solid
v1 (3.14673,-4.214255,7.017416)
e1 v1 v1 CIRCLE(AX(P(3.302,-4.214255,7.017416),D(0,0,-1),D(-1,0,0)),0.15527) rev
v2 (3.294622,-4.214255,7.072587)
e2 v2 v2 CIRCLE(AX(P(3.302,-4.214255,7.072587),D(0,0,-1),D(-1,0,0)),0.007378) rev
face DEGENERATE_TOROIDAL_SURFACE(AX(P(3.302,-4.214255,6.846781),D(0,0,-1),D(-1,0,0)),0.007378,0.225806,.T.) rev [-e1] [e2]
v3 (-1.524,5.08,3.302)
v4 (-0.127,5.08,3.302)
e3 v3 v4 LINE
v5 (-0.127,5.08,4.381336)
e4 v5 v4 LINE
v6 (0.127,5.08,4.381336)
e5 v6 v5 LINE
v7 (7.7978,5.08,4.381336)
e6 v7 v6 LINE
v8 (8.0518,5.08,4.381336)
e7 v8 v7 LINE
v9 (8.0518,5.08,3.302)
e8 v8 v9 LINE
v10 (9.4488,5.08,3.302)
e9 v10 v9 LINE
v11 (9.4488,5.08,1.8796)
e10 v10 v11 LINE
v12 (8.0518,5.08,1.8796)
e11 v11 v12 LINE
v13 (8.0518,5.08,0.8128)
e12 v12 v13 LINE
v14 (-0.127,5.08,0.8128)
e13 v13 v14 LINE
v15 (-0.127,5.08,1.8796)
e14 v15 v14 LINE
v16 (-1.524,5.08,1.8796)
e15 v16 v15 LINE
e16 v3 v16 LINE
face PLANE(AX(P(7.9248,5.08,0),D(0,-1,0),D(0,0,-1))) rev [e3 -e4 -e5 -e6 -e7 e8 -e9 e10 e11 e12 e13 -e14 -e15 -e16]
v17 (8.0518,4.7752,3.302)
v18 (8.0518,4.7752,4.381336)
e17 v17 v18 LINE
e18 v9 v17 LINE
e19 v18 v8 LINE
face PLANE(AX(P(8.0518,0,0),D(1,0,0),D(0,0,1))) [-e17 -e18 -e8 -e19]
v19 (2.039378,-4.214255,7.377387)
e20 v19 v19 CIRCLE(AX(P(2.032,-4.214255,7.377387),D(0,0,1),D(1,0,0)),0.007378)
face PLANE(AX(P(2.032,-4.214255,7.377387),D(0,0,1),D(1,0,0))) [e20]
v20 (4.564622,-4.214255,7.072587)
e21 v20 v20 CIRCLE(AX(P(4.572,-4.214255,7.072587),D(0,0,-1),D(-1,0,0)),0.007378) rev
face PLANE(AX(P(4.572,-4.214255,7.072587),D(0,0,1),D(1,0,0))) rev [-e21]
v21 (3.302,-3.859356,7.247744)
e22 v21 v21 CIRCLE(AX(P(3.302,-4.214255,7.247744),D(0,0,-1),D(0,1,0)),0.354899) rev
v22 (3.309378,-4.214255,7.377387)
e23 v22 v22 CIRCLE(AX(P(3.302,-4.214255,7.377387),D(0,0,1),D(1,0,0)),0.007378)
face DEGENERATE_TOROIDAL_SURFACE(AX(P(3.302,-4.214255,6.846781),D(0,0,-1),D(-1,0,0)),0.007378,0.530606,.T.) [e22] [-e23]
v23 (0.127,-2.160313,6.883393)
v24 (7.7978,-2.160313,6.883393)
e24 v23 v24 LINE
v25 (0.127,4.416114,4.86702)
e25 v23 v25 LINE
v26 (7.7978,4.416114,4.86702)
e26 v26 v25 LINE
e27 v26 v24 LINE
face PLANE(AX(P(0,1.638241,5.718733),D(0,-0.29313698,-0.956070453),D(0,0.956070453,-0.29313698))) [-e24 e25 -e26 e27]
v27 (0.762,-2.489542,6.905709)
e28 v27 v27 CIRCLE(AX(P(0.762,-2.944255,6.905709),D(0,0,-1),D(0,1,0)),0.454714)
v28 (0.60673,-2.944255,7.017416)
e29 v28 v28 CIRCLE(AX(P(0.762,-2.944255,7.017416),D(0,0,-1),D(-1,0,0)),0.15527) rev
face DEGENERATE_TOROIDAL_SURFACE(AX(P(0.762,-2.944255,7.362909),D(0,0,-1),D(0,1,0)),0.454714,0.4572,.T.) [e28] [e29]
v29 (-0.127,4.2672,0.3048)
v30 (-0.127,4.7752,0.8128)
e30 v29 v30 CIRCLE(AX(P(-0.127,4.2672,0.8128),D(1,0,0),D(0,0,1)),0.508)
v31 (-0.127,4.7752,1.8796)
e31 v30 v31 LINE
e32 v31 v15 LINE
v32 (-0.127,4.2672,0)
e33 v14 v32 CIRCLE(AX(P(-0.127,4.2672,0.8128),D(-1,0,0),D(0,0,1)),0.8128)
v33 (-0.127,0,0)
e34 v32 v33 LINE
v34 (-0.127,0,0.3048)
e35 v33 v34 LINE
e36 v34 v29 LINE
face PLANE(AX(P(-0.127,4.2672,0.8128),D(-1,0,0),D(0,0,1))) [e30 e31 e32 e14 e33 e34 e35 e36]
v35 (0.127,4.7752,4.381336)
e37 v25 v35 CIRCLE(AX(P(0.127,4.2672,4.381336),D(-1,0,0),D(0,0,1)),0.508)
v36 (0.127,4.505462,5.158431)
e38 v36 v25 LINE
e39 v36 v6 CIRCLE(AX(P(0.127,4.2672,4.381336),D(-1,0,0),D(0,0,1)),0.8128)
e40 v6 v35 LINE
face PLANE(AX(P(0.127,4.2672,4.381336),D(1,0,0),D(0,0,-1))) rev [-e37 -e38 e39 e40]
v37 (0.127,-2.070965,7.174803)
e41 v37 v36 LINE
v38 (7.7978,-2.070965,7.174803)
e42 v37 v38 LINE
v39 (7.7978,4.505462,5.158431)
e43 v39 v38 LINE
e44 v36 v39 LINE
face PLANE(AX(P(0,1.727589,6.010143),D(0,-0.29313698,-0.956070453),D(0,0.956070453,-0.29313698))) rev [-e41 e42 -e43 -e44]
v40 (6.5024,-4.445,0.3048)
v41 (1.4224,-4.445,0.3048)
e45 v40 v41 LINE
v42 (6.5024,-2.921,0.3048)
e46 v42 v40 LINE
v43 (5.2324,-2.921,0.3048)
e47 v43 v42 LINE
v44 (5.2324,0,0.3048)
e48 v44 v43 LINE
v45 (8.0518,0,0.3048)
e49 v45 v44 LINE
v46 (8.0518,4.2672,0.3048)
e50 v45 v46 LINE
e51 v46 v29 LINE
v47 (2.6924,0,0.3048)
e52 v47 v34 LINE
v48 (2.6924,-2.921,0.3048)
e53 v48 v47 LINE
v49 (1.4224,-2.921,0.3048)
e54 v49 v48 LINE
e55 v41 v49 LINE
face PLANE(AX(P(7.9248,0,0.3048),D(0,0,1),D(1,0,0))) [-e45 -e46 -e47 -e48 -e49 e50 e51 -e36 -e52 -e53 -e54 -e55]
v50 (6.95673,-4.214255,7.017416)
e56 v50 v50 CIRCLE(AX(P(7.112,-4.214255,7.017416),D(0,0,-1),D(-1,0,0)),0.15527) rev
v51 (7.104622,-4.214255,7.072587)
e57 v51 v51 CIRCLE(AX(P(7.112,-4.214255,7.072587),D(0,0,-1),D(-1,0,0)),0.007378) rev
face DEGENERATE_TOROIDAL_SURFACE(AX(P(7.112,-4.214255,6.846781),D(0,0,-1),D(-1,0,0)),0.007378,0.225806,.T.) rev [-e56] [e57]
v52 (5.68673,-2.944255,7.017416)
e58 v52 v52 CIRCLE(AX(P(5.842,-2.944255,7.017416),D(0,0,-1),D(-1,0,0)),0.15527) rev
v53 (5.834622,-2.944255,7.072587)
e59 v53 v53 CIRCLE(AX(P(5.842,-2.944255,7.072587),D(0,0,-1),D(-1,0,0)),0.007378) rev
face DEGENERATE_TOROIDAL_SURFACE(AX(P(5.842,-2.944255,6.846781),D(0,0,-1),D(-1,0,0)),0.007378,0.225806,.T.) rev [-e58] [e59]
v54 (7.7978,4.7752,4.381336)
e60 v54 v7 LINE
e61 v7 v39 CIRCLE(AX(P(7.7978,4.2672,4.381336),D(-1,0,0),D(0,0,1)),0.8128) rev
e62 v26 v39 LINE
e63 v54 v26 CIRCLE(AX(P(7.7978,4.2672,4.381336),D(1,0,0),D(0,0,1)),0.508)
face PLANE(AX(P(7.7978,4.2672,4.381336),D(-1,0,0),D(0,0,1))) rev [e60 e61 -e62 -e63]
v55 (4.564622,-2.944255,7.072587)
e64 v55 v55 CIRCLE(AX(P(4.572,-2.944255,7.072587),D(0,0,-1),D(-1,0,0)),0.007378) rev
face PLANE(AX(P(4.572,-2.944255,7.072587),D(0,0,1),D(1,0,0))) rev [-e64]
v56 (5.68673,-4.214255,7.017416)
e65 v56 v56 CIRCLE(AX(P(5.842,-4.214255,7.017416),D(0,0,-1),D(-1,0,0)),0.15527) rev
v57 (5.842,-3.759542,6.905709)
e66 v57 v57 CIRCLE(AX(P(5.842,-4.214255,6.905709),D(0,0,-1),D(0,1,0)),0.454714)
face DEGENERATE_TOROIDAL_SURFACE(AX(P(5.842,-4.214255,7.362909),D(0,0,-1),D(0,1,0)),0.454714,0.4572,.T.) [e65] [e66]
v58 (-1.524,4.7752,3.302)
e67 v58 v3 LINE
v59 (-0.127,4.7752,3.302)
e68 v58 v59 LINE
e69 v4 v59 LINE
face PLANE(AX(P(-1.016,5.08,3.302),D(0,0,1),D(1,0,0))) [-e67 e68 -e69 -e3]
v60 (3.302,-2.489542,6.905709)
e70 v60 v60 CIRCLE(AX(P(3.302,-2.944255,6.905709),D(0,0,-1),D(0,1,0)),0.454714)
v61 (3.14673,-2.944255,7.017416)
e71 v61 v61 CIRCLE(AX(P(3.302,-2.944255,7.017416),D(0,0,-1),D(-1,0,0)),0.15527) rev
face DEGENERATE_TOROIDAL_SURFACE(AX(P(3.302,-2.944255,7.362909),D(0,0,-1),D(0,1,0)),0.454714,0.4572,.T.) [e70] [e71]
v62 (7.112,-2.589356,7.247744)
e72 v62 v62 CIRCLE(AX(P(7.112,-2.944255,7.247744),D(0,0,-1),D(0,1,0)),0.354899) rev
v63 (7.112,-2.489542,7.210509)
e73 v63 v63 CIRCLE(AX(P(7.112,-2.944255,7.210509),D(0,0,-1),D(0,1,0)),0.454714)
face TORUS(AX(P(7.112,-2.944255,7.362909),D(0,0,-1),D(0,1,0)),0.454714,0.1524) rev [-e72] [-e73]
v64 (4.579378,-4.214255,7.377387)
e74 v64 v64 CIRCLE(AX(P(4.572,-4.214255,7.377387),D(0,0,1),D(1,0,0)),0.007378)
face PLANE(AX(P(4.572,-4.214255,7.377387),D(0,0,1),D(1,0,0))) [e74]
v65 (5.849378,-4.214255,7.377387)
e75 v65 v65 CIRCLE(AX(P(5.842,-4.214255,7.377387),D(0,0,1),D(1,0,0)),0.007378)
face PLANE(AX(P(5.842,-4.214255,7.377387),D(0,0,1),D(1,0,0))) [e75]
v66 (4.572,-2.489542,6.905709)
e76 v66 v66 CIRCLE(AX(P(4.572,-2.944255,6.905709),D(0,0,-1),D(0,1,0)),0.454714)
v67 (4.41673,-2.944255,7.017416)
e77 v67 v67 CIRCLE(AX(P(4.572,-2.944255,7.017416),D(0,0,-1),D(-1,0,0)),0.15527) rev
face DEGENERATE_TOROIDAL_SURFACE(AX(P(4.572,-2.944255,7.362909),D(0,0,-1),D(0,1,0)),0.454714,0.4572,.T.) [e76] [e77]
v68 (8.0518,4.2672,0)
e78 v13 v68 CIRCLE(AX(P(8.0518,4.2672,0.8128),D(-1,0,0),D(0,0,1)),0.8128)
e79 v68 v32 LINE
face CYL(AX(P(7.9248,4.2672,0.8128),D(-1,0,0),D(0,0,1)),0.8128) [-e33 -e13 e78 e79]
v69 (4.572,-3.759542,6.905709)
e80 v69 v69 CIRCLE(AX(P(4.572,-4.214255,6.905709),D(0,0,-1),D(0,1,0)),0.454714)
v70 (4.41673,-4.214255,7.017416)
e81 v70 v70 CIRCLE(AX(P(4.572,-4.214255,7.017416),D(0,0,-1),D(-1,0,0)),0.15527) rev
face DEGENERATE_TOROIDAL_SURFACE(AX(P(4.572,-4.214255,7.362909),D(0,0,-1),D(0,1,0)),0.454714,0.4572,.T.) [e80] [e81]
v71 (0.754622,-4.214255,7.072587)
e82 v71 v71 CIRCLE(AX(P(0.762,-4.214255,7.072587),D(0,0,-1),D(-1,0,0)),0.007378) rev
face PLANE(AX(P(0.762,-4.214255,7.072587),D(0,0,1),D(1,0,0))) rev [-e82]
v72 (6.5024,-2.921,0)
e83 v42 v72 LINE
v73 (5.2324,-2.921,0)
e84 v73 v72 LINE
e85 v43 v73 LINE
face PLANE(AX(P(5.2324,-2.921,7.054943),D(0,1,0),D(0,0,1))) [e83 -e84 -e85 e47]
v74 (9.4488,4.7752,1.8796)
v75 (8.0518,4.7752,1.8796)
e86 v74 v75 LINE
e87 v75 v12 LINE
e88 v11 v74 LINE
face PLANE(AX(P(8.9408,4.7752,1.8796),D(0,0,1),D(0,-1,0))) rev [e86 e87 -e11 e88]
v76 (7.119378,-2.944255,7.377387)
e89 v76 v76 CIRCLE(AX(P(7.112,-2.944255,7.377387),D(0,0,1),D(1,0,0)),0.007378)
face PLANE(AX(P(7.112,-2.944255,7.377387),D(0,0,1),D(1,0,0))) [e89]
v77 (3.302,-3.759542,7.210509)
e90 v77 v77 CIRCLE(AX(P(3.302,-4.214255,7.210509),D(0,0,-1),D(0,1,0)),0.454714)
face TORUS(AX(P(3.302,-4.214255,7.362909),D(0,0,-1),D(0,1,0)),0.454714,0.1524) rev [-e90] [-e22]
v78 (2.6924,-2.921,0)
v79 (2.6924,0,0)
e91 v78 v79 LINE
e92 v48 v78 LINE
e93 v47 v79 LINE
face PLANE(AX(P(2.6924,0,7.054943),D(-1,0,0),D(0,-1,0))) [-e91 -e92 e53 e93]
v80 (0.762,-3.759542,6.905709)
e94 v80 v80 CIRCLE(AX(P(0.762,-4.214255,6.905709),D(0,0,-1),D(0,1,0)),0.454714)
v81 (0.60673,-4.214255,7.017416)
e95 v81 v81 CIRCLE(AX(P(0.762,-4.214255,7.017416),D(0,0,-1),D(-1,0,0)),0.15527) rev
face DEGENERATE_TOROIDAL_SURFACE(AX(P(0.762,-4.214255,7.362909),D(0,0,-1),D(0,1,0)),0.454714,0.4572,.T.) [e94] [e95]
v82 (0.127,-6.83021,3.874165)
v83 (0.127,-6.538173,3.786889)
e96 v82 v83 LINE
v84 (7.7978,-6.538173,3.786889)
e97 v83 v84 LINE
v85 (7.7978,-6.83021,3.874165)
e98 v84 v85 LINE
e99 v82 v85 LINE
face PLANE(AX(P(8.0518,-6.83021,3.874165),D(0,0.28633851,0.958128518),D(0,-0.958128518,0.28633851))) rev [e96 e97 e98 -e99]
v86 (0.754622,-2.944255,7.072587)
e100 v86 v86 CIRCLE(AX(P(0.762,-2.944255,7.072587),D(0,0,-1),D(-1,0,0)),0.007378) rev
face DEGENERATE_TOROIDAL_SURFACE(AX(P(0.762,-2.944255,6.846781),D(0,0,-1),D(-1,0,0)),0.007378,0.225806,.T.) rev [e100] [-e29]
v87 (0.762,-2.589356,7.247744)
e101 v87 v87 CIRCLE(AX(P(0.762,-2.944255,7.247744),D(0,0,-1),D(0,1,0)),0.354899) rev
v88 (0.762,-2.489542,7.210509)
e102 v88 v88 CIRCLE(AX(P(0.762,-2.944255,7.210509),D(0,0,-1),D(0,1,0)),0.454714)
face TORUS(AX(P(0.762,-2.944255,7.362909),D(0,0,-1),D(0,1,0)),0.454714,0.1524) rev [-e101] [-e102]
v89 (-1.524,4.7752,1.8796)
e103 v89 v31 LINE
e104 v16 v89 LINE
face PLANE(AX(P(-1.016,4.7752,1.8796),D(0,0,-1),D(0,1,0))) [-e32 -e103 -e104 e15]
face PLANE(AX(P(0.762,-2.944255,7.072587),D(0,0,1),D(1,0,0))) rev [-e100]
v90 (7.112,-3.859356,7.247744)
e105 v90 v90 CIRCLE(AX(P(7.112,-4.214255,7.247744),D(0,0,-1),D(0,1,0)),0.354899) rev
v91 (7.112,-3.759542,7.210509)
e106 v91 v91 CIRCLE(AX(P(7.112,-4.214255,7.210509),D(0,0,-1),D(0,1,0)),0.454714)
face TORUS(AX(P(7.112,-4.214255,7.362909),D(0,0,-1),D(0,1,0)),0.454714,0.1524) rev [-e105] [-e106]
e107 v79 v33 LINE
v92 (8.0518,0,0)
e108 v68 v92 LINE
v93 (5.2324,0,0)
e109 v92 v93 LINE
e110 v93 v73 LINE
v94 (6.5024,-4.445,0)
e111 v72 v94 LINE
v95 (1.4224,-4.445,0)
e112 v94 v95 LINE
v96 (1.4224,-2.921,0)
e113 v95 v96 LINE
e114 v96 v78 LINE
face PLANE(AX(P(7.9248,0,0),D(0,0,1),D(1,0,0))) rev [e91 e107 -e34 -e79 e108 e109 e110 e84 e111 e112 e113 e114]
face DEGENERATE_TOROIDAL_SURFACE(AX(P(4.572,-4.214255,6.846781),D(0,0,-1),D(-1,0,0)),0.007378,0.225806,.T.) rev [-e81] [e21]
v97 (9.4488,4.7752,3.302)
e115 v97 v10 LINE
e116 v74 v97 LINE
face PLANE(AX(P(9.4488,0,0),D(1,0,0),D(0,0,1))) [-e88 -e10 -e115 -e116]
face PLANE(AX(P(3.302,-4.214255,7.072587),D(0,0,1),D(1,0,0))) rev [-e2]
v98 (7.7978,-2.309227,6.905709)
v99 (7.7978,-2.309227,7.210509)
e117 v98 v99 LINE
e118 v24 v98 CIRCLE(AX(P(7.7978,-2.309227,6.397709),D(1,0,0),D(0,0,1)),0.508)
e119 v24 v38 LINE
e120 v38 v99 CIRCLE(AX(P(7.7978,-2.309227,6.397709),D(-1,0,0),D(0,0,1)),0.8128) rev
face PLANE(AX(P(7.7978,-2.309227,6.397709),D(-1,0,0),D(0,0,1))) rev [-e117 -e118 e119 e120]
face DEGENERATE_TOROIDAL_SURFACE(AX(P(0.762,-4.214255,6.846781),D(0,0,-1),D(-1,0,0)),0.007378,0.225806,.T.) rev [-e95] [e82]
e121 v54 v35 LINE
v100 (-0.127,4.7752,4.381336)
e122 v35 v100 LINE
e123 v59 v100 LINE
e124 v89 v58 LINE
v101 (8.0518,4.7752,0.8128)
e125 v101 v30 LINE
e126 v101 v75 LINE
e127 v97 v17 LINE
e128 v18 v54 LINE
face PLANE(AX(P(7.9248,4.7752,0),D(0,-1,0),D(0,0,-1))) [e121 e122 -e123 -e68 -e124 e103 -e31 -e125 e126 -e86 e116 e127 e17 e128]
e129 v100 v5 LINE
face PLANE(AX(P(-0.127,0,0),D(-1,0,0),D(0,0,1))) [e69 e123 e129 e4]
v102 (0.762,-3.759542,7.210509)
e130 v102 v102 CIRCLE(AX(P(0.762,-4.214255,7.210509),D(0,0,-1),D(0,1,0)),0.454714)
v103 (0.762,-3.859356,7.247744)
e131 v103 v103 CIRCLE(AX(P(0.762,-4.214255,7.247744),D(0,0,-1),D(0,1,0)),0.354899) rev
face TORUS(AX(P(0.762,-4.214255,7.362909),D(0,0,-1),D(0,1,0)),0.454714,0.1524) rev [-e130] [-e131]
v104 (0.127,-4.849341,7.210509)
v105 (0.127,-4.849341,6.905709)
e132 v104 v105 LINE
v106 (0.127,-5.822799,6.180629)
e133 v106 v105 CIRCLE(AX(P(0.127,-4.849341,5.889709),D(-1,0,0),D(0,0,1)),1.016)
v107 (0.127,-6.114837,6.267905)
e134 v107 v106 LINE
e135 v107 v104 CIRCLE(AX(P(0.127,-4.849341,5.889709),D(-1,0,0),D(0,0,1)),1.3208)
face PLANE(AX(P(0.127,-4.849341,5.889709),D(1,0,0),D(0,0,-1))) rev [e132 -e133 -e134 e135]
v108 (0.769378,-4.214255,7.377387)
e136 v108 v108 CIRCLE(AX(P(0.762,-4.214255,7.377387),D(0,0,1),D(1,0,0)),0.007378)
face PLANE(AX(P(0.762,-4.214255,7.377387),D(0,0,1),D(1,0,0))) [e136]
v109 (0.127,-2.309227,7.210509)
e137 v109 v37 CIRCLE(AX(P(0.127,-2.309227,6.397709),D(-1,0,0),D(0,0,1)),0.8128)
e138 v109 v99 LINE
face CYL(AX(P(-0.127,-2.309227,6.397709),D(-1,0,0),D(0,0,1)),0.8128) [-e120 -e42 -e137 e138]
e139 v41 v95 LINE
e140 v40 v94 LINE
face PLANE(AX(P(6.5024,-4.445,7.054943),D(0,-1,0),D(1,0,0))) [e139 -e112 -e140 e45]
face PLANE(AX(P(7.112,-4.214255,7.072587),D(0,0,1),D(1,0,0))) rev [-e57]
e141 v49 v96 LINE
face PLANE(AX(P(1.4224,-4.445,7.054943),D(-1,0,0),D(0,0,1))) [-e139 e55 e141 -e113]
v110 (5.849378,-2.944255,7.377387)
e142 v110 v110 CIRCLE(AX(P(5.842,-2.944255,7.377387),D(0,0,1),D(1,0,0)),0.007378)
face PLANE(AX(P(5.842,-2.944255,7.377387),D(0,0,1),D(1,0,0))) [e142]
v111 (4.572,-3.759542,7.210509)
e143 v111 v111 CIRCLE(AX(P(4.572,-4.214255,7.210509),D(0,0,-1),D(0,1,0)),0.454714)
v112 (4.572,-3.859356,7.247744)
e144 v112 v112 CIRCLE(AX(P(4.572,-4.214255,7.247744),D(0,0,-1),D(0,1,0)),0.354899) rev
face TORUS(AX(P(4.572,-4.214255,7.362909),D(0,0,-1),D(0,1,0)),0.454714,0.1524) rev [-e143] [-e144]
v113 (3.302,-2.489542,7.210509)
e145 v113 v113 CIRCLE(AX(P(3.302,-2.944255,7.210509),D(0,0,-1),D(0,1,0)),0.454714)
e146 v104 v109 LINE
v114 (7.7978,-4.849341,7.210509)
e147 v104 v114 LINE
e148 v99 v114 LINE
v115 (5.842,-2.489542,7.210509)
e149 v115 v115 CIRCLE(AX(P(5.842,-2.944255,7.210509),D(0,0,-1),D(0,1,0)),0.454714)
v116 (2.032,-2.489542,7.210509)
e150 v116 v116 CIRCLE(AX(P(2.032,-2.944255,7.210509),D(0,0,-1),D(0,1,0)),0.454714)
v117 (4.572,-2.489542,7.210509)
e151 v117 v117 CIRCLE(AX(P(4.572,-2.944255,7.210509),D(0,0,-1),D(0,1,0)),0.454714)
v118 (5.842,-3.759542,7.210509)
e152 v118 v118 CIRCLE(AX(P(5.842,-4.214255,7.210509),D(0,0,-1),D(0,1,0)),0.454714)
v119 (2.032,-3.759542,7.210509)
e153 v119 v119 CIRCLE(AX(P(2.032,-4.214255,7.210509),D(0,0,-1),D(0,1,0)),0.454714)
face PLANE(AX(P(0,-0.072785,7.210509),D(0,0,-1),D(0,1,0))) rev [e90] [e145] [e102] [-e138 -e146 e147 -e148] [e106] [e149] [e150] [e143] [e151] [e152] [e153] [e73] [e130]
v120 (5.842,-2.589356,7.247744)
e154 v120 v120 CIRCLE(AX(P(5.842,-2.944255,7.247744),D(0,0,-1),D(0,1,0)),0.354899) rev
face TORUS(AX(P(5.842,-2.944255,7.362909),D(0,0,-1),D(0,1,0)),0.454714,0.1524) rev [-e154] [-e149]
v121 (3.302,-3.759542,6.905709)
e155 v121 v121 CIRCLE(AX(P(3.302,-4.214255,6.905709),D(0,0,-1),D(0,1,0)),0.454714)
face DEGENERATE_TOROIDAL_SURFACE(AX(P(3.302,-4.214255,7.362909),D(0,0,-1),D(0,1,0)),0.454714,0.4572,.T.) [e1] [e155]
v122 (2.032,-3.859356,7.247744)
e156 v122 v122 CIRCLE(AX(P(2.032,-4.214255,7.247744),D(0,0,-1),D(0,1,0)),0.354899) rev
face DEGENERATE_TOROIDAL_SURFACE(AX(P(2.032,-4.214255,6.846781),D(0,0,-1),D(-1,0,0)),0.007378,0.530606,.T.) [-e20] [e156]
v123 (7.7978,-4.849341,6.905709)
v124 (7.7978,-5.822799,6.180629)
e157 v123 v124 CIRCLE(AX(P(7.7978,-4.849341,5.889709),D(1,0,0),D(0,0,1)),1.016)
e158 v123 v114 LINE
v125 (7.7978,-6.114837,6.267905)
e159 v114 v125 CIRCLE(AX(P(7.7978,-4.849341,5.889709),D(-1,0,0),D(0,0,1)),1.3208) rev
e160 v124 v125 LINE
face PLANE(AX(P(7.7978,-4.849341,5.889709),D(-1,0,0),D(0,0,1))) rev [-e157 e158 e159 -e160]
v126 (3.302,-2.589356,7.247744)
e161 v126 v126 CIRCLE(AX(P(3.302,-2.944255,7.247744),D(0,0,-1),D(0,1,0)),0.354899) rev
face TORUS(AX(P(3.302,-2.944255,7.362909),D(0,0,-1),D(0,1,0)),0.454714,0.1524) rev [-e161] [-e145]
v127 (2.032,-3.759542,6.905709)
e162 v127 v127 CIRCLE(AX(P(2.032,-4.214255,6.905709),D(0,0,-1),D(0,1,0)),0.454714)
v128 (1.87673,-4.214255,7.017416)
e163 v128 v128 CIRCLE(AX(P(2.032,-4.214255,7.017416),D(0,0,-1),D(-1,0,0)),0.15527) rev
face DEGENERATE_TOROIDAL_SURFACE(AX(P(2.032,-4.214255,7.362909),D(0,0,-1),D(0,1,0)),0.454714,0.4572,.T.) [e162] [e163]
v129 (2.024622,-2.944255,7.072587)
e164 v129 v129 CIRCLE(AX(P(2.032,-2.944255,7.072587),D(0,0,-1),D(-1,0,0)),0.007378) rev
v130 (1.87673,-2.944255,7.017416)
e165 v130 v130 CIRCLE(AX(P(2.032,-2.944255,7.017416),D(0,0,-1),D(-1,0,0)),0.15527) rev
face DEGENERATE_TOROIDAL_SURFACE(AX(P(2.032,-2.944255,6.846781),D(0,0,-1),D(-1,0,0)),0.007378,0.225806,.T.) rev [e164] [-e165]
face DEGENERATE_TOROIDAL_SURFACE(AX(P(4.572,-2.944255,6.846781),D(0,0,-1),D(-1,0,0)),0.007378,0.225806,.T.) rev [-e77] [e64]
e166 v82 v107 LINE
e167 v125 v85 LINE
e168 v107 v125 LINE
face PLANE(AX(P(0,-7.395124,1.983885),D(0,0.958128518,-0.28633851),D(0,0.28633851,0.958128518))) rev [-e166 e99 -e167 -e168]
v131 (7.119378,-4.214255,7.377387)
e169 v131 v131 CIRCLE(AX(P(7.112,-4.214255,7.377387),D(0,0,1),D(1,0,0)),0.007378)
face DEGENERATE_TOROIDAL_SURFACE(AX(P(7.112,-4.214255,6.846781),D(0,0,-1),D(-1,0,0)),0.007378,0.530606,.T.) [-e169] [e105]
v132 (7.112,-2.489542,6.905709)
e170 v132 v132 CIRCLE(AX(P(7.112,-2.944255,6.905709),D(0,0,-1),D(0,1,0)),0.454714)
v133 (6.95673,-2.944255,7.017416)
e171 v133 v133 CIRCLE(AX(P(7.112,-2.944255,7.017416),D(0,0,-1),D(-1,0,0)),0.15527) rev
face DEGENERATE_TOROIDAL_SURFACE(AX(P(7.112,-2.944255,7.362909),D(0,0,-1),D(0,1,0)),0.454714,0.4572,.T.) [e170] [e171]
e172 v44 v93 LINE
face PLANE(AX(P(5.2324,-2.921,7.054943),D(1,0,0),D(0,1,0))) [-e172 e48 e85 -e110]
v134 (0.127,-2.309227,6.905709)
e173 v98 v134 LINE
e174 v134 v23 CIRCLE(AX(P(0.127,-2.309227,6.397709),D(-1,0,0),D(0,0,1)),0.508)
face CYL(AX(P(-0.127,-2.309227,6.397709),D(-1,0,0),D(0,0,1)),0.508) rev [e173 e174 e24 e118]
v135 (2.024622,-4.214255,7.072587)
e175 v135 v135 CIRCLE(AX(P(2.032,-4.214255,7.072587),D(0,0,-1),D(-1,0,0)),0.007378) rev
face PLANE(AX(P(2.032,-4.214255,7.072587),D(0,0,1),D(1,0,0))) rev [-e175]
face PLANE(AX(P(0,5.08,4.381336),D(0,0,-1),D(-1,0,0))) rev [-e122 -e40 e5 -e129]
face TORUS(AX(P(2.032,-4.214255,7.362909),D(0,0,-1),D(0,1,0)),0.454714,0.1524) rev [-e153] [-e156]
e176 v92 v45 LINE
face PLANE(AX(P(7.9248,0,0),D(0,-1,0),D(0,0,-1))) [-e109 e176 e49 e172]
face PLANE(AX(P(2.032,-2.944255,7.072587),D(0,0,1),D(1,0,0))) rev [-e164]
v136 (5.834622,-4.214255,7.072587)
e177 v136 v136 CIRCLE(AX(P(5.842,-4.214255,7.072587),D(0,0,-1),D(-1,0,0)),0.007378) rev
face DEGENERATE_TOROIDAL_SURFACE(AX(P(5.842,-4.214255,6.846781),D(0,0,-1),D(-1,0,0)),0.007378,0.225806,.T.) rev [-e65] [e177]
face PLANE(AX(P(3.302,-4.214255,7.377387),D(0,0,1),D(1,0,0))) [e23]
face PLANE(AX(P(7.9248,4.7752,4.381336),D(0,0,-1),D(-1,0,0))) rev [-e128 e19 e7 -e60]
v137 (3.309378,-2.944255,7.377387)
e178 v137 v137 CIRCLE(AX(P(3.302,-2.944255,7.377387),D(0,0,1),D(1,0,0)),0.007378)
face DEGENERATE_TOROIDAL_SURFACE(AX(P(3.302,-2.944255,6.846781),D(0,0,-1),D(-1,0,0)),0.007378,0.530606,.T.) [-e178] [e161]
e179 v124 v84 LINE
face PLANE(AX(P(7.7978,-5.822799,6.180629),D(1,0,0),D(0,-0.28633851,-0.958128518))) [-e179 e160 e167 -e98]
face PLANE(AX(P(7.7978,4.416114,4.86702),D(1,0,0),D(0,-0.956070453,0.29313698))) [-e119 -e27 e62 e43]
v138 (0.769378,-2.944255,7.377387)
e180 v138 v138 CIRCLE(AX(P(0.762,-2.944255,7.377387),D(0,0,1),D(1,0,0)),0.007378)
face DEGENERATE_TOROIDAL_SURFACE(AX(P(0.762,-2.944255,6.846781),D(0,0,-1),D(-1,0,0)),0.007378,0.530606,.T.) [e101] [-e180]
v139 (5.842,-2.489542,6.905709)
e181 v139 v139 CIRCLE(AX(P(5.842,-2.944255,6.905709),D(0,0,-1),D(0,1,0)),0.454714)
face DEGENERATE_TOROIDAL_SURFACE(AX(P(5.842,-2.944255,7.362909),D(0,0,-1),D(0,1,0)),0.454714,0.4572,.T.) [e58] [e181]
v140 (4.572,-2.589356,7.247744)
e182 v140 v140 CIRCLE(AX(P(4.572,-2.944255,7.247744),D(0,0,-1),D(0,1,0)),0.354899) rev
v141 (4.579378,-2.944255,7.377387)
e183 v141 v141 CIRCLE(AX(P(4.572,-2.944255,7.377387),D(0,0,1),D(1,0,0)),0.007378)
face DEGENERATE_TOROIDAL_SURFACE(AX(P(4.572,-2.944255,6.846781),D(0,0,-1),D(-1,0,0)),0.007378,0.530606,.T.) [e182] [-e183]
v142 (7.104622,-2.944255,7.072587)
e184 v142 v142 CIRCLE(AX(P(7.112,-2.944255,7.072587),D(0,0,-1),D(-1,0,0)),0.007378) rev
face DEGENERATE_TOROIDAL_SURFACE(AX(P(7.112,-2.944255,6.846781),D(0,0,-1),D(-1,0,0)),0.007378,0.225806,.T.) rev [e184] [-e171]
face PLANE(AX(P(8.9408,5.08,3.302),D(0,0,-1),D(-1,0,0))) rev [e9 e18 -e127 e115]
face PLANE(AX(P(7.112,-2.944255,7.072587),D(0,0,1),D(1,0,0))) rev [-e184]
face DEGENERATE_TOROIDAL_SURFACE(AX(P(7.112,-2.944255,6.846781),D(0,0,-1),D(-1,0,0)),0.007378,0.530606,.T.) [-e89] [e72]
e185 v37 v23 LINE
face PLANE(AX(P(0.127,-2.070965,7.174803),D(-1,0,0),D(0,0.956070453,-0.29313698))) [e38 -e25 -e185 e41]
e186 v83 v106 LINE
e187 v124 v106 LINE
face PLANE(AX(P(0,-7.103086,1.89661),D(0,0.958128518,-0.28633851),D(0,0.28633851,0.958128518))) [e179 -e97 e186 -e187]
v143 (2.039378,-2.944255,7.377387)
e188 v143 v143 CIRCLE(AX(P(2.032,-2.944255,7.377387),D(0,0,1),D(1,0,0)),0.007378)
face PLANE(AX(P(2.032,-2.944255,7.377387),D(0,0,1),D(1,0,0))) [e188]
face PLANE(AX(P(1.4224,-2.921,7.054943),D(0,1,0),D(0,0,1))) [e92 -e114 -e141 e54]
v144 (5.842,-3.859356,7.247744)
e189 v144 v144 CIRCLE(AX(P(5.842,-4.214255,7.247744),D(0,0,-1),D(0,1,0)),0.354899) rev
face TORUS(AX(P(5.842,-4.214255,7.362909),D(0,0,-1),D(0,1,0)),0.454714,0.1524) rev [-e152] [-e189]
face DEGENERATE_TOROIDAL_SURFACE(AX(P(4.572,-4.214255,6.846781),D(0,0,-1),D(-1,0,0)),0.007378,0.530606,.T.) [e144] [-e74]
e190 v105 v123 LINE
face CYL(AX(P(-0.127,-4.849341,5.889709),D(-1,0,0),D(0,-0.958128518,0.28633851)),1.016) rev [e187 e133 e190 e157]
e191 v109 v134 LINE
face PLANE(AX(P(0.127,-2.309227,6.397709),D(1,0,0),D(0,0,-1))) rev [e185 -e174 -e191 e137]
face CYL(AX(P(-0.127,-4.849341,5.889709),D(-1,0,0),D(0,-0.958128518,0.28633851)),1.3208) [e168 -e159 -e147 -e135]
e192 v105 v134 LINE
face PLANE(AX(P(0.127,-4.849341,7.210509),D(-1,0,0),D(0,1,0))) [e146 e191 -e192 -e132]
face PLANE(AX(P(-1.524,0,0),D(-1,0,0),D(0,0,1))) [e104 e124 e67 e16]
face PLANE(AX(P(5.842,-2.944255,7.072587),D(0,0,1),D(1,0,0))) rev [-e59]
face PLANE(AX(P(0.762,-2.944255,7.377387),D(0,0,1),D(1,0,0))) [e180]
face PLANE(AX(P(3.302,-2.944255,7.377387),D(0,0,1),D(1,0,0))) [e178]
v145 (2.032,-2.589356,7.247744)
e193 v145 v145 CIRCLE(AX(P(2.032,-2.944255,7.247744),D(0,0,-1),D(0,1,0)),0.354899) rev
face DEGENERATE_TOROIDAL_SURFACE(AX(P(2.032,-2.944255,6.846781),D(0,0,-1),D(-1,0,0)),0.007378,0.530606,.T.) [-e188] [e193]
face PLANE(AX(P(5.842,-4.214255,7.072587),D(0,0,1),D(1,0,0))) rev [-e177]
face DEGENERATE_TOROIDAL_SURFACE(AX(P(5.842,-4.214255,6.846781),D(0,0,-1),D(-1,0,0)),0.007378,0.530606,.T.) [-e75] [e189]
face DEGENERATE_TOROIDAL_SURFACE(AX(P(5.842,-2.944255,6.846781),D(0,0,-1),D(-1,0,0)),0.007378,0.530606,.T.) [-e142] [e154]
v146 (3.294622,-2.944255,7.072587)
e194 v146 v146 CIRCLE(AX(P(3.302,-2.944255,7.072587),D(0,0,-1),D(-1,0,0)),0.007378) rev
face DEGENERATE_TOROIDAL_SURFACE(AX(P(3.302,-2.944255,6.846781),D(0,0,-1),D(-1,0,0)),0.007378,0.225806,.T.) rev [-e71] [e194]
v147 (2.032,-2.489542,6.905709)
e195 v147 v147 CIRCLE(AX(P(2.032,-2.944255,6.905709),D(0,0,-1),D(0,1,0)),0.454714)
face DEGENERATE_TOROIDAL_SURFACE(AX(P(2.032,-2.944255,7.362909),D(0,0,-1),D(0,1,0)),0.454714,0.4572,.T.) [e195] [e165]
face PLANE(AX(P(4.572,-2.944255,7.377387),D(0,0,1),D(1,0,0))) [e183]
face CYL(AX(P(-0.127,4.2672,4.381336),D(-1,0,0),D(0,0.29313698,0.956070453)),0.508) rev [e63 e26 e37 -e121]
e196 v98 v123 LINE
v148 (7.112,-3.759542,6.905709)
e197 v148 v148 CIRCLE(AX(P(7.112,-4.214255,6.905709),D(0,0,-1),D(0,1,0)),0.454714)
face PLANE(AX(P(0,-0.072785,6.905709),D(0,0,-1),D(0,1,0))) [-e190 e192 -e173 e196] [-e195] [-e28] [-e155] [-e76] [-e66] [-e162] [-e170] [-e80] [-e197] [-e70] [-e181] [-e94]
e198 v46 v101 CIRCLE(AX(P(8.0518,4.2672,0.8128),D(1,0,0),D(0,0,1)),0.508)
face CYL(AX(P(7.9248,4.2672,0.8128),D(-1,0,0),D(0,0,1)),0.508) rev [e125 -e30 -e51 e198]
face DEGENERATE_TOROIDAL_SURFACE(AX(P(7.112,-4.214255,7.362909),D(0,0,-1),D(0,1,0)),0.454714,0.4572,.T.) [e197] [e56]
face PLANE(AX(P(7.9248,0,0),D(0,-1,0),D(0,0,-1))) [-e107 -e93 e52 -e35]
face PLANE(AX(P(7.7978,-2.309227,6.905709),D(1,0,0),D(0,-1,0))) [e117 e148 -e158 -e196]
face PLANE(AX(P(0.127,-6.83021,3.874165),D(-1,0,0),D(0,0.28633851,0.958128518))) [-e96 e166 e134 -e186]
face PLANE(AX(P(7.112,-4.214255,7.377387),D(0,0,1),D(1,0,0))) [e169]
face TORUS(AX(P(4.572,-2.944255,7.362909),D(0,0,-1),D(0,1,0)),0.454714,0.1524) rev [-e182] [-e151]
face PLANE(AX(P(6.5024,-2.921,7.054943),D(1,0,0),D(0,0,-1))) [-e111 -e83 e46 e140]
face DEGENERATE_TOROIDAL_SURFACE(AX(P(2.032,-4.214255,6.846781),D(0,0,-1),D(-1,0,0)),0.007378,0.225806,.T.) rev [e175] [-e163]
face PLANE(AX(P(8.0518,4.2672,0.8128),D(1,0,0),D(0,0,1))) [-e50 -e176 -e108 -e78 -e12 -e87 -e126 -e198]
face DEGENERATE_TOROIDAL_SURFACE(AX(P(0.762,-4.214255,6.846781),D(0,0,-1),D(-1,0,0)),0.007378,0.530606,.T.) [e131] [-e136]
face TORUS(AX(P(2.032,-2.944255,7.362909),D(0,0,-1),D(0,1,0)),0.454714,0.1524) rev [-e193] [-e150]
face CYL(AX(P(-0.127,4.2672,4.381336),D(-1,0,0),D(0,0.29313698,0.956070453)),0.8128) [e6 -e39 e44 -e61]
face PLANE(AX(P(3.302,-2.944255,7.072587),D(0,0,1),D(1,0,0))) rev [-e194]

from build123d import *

# Parameters (mm, degrees)
BASE_FLANGE1_DEPTH     = 7.9248
SKETCH6_W              = 1.4224
SKETCH6_H              = 0.3048
BOSS_EXTRUDE1_DEPTH    = 1.016
SKETCH7_W              = 2.1844
SKETCH7_H              = 9.355592462
CUT_EXTRUDE1_DEPTH     = 18.125283198
BOSS_EXTRUDE2_DEPTH    = 0.3048
CUT_EXTRUDE3_REACH     = 14.95
BOSS_EXTRUDE5_START    = 0.127
SKETCH17_W             = 1.079336494
SKETCH17_H             = 0.3048
BOSS_EXTRUDE5_DEPTH    = 0.127
SKETCH18_W             = 1.4224
SKETCH18_H             = 0.3048
BOSS_EXTRUDE6_DEPTH    = 0.508
EDGE_FLANGE1_DEPTH     = 8.1788
EDGE_FLANGE2_DEPTH     = 8.1788
EDGE_FLANGE3_DEPTH     = 8.1788
SKETCH38_R             = 0.3937
BOSS_EXTRUDE7_DEPTH    = 0.166878
FILLET1_R              = 0.530606
FILLET2_R              = 0.1524
LPATTERN3_COUNT        = 6
LPATTERN3_PITCH        = 1.27
LPATTERN3_COUNT_DIR2   = 2
LPATTERN3_PITCH_DIR2   = 1.27
FILLET1_OF_LPATTERN3_R = 0.530606
FILLET2_OF_LPATTERN3_R = 0.1524
CUT_EXTRUDE4_START     = -0.254
CUT_EXTRUDE4_DEPTH     = 0.254


# Read off the part's stored shape, not the designer's step: SurfaceCut1
# Sheet-metal steps are written as plain solids
with BuildPart() as part:
    # Sketch1 → Base-Flange1 (new body)
    with BuildSketch(Plane(origin=(0, 0, 0), x_dir=(0, 0, -1), z_dir=(1, 0, 0))):
        with BuildLine():
            Line((0, 0), (0, 4.2672))
            ThreePointArc((0, 4.2672), (-0.238063608, 4.841936392), (-0.8128, 5.08))
            Line((-0.8128, 5.08), (-4.381336494, 5.08))
            ThreePointArc((-4.381336494, 5.08), (-4.911163821, 4.88358206), (-5.184919317, 4.38925936))
            Line((-5.184919317, 4.38925936), (-6.693208159, -5.5406223))
            ThreePointArc((-6.693208159, -5.5406223), (-6.678749154, -5.857431349), (-6.544153202, -6.144591522))
            Line((-6.544153202, -6.144591522), (-5.621689854, -7.397477204))
            Line((-5.621689854, -7.397477204), (-5.253554372, -7.897477204))
            Line((-5.253554372, -7.897477204), (-5.008106423, -7.716761006))
            Line((-5.008106423, -7.716761006), (-5.376241904, -7.216761006))
            Line((-5.376241904, -7.216761006), (-6.298705252, -5.963875324))
            ThreePointArc((-6.298705252, -5.963875324), (-6.382827723, -5.784400216), (-6.391864601, -5.586394561))
            Line((-6.391864601, -5.586394561), (-4.883575758, 4.3434871))
            ThreePointArc((-4.883575758, 4.3434871), (-4.712478573, 4.652438788), (-4.381336494, 4.7752))
            Line((-4.381336494, 4.7752), (-0.8128, 4.7752))
            ThreePointArc((-0.8128, 4.7752), (-0.453589755, 4.626410245), (-0.3048, 4.2672))
            Line((-0.3048, 4.2672), (-0.3048, 0))
            Line((-0.3048, 0), (0, 0))
        make_face()
    extrude(amount=BASE_FLANGE1_DEPTH)

    # Sketch6 → Boss-Extrude1 (add)
    with BuildSketch(Plane(origin=(7.9248, 0, 0), x_dir=(0, 0, -1), z_dir=(1, 0, 0))):
        with Locations((-2.5908, 4.9276)):
            Rectangle(SKETCH6_W, SKETCH6_H)
    boss_extrude1 = extrude(amount=BOSS_EXTRUDE1_DEPTH)

    # Mirror1: Boss-Extrude1 across plane
    add(boss_extrude1.mirror(Plane(origin=(3.9624, 0, 0), x_dir=(0, 0, 1), z_dir=(1, 0, 0))))

    # Sketch7 → Cut-Extrude1 (cut, through all)
    with BuildSketch(Plane(origin=(0, 5.08, 0), x_dir=(1, 0, 0), z_dir=(0, 1, 0))):
        with Locations((0.0762, -9.059132725)):
            Rectangle(SKETCH7_W, SKETCH7_H)
        with Locations((7.8486, -9.059132725)):
            Rectangle(SKETCH7_W, SKETCH7_H)
    extrude(amount=-CUT_EXTRUDE1_DEPTH, mode=Mode.SUBTRACT)

    # Sketch8 → Boss-Extrude2 (add)
    with BuildSketch(Plane(origin=(0, 0, 0), x_dir=(-1, 0, 0), z_dir=(0, 0, -1))):
        Polygon((-5.2324, 0), (-2.6924, 0), (-2.6924, -2.921), (-1.4224, -2.921), (-1.4224, -4.445), (-6.5024, -4.445), (-6.5024, -2.921), (-5.2324, -2.921), align=None)
    extrude(amount=-BOSS_EXTRUDE2_DEPTH)

    # Sketch12 → Cut-Extrude3 (cut, up to next)
    with BuildSketch(Plane(origin=(6.7564, 0, 0), x_dir=(0, 0, -1), z_dir=(1, 0, 0)), mode=Mode.PRIVATE) as cut_extrude3_sk1:
        with BuildLine():
            Line((-4.381336494, 4.7752), (-4.381336494, 5.08))
            ThreePointArc((-4.381336494, 5.08), (-4.911163821, 4.88358206), (-5.184919317, 4.38925936))
            Line((-5.184919317, 4.38925936), (-6.693208159, -5.5406223))
            ThreePointArc((-6.693208159, -5.5406223), (-6.678749154, -5.857431349), (-6.544153202, -6.144591522))
            Line((-6.544153202, -6.144591522), (-5.253554372, -7.897477204))
            Line((-5.253554372, -7.897477204), (-5.008106423, -7.716761006))
            Line((-5.008106423, -7.716761006), (-6.298705252, -5.963875324))
            ThreePointArc((-6.298705252, -5.963875324), (-6.382827723, -5.784400216), (-6.391864601, -5.586394561))
            Line((-6.391864601, -5.586394561), (-4.883575758, 4.3434871))
            ThreePointArc((-4.883575758, 4.3434871), (-4.712478573, 4.652438788), (-4.381336494, 4.7752))
        make_face()
    cut_extrude3_tool1 = extrude(cut_extrude3_sk1.sketch, amount=-CUT_EXTRUDE3_REACH, mode=Mode.PRIVATE) & part.part
    add(cut_extrude3_tool1.solids().sort_by_distance((6.7564, 4.9276, 4.513171))[0], mode=Mode.SUBTRACT)

    # Sketch17 → Boss-Extrude5 (add)
    with BuildSketch(Plane.ZY.offset(BOSS_EXTRUDE5_START)):
        with BuildLine():
            Line((0.3048, 0), (0.3048, 4.2672))
            ThreePointArc((0.3048, 4.2672), (0.453589755, 4.626410245), (0.8128, 4.7752))
            Line((0.8128, 4.7752), (1.8796, 4.7752))
            Line((1.8796, 4.7752), (1.8796, 5.08))
            Line((1.8796, 5.08), (0.8128, 5.08))
            ThreePointArc((0.8128, 5.08), (0.238063608, 4.841936392), (0, 4.2672))
            Line((0, 4.2672), (0, 0))
            Line((0, 0), (0.3048, 0))
        make_face()
        with Locations((3.841668247, 4.9276)):
            Rectangle(SKETCH17_W, SKETCH17_H)
    boss_extrude5 = extrude(amount=-BOSS_EXTRUDE5_DEPTH)

    # Sketch18 → Boss-Extrude6 (add)
    with BuildSketch(Plane.ZY.offset(1.016)):
        with Locations((2.5908, 4.9276)):
            Rectangle(SKETCH18_W, SKETCH18_H)
    boss_extrude6 = extrude(amount=BOSS_EXTRUDE6_DEPTH)

    # Mirror2: Boss-Extrude5, Boss-Extrude6 across plane
    add(boss_extrude5.mirror(Plane(origin=(3.9624, 0, 0), x_dir=(0, 0, 1), z_dir=(1, 0, 0))))
    add(boss_extrude6.mirror(Plane(origin=(3.9624, 0, 0), x_dir=(0, 0, 1), z_dir=(1, 0, 0))))

    # Edge-Flange1 section (across the edge) → Edge-Flange1 (add)
    with BuildSketch(Plane(origin=(8.0518, 4.7752, 4.756922219), x_dir=(0, -0.29313697988126164, -0.9560704529615445), z_dir=(-1, 0, 0))):
        with BuildLine():
            Line((-0.3048, 0.375585725), (-0.3048, 7.254186565))
            Line((-0.3048, 7.254186565), (0, 7.254186565))
            Line((0, 7.254186565), (0, 0.375585725))
            ThreePointArc((0, 0.375585725), (0.099519828, 0.073579187), (0.359086414, -0.110098065))
            Line((0.359086414, -0.110098065), (0.269738263, -0.401508339))
            ThreePointArc((0.269738263, -0.401508339), (-0.145568275, -0.107624736), (-0.3048, 0.375585725))
        make_face()
    extrude(amount=EDGE_FLANGE1_DEPTH)

    # Edge-Flange2 section (across the edge) → Edge-Flange2 (add)
    with BuildSketch(Plane(origin=(8.0518, -2.233098073, 6.90570877), x_dir=(0, 0, -1), z_dir=(-1, 0, 0))):
        with BuildLine():
            Line((-0.3048, 0.076128948), (-0.3048, 2.616242631))
            Line((-0.3048, 2.616242631), (0, 2.616242631))
            Line((0, 2.616242631), (0, 0.076128948))
            ThreePointArc((0, 0.076128948), (0.005610029, 0.00084072), (0.02231621, -0.072784638))
            Line((0.02231621, -0.072784638), (-0.269094064, -0.162132789))
            ThreePointArc((-0.269094064, -0.162132789), (-0.295823953, -0.044332217), (-0.3048, 0.076128948))
        make_face()
    extrude(amount=EDGE_FLANGE2_DEPTH)

    # Edge-Flange3 section (across the edge) → Edge-Flange3 (add)
    with BuildSketch(Plane(origin=(8.0518, -5.606107734, 6.90570877), x_dir=(0, 0.9581285182650292, -0.2863385103112391), z_dir=(-1, 0, 0))):
        with BuildLine():
            Line((-0.3048, 0.75676703), (-0.3048, 3.255115835))
            Line((-0.3048, 3.255115835), (0, 3.255115835))
            Line((0, 3.255115835), (0, 0.75676703))
            ThreePointArc((0, 0.75676703), (0.201190008, 0.149856265), (0.725080074, -0.216691544))
            Line((0.725080074, -0.216691544), (0.637804096, -0.508729117))
            ThreePointArc((0.637804096, -0.508729117), (-0.043252989, -0.032216965), (-0.3048, 0.75676703))
        make_face()
    extrude(amount=EDGE_FLANGE3_DEPTH)

    # Sketch38 → Boss-Extrude7 (add)
    with BuildSketch(Plane.XY.offset(7.21050877)):
        with Locations(Location((0.762, -2.944255442, 0), (0, 0, 90))):
            Circle(SKETCH38_R)
    boss_extrude7 = extrude(amount=BOSS_EXTRUDE7_DEPTH)

    # Fillet1
    # the kernel refuses this fillet: 0.530606 mm, written as the material it takes off along each edge
    with BuildSketch(Plane(origin=(0.762, -2.944255442, 7.37738677), x_dir=(0, 1, 0), z_dir=(1, 0, 0))) as fillet1_piece_1:
        with BuildLine():
            CenterArc((0.007378024, -0.530606), FILLET1_R, 43.274584136, 46.725415864)
            Line((0.007378024, 0), (0.007378024, 0.01061212))
            Line((0.007378024, 0.01061212), (0.3937, 0.01061212))
            Line((0.3937, 0.01061212), (0.40431212, 0))
            ThreePointArc((0.40431212, 0), (0.40431212, -0.083439), (0.40142644, -0.15960344))
            Line((0.40142644, -0.15960344), (0.3937, -0.166878))
        make_face()
    revolve(axis=Axis((0.762, -2.944255442, 7.37738677), (0, 0, 1)), mode=Mode.SUBTRACT)

    # Fillet2
    fillet2_edges = [part.edges().sort_by_distance(p)[0] for p in [
        (0.762, -3.337955442, 7.21050877),
    ]]
    fillet(fillet2_edges, radius=FILLET2_R)

    # SurfaceCut1 outline → SurfaceCut1 (revolve, cut)
    with BuildSketch(Plane(origin=(0.762, -2.944255442, 0), x_dir=(1, 0, 0), z_dir=(0, -1, 0))):
        with BuildLine():
            Line((0, 6.90570877), (0.454713562, 6.90570877))
            ThreePointArc((0.454713562, 6.90570877), (0.294912925, 6.934544911), (0.155269914, 7.017415873))
            ThreePointArc((0.155269914, 7.017415873), (0.086301783, 7.058344921), (0.007378024, 7.07258677))
            Line((0.007378024, 7.07258677), (0, 7.07258677))
            Line((0, 7.07258677), (0, 6.90570877))
        make_face()
    surfacecut1 = revolve(axis=Axis((0.762, -2.944255442, 0), (0, 0, 1)), mode=Mode.SUBTRACT)

    # LPattern3: Boss-Extrude7, SurfaceCut1 6 × 2
    with Locations(*[(i * LPATTERN3_PITCH, -j * LPATTERN3_PITCH_DIR2, 0) for i in range(LPATTERN3_COUNT) for j in range(LPATTERN3_COUNT_DIR2) if (i, j) != (0, 0)]):
        add(boss_extrude7)
        add(surfacecut1, mode=Mode.SUBTRACT)

    # Fillet1 of LPattern3
    # the kernel refuses this fillet: 0.530606 mm, written as the material it takes off along each edge
    with BuildSketch(Plane(origin=(0.762, -4.214255442, 7.37738677), x_dir=(0, 1, 0), z_dir=(1, 0, 0))) as fillet1_of_lpattern3_piece_1:
        with BuildLine():
            CenterArc((0.007378024, -0.530606), FILLET1_OF_LPATTERN3_R, 43.274584136, 46.725415864)
            Line((0.007378024, 0), (0.007378024, 0.01061212))
            Line((0.007378024, 0.01061212), (0.3937, 0.01061212))
            Line((0.3937, 0.01061212), (0.40431212, 0))
            ThreePointArc((0.40431212, 0), (0.40431212, -0.083439), (0.40142644, -0.15960344))
            Line((0.40142644, -0.15960344), (0.3937, -0.166878))
        make_face()
    revolve(axis=Axis((0.762, -4.214255442, 7.37738677), (0, 0, 1)), mode=Mode.SUBTRACT)
    with BuildSketch(Plane(origin=(2.032, -2.944255442, 7.37738677), x_dir=(0, 1, 0), z_dir=(1, 0, 0))) as fillet1_of_lpattern3_piece_2:
        with BuildLine():
            CenterArc((0.007378024, -0.530606), FILLET1_OF_LPATTERN3_R, 43.274584136, 46.725415864)
            Line((0.007378024, 0), (0.007378024, 0.01061212))
            Line((0.007378024, 0.01061212), (0.3937, 0.01061212))
            Line((0.3937, 0.01061212), (0.40431212, 0))
            ThreePointArc((0.40431212, 0), (0.40431212, -0.083439), (0.40142644, -0.15960344))
            Line((0.40142644, -0.15960344), (0.3937, -0.166878))
        make_face()
    revolve(axis=Axis((2.032, -2.944255442, 7.37738677), (0, 0, 1)), mode=Mode.SUBTRACT)
    with BuildSketch(Plane(origin=(2.032, -4.214255442, 7.37738677), x_dir=(0, 1, 0), z_dir=(1, 0, 0))) as fillet1_of_lpattern3_piece_3:
        with BuildLine():
            CenterArc((0.007378024, -0.530606), FILLET1_OF_LPATTERN3_R, 43.274584136, 46.725415864)
            Line((0.007378024, 0), (0.007378024, 0.01061212))
            Line((0.007378024, 0.01061212), (0.3937, 0.01061212))
            Line((0.3937, 0.01061212), (0.40431212, 0))
            ThreePointArc((0.40431212, 0), (0.40431212, -0.083439), (0.40142644, -0.15960344))
            Line((0.40142644, -0.15960344), (0.3937, -0.166878))
        make_face()
    revolve(axis=Axis((2.032, -4.214255442, 7.37738677), (0, 0, 1)), mode=Mode.SUBTRACT)
    with BuildSketch(Plane(origin=(3.302, -2.944255442, 7.37738677), x_dir=(0, 1, 0), z_dir=(1, 0, 0))) as fillet1_of_lpattern3_piece_4:
        with BuildLine():
            CenterArc((0.007378024, -0.530606), FILLET1_OF_LPATTERN3_R, 43.274584136, 46.725415864)
            Line((0.007378024, 0), (0.007378024, 0.01061212))
            Line((0.007378024, 0.01061212), (0.3937, 0.01061212))
            Line((0.3937, 0.01061212), (0.40431212, 0))
            ThreePointArc((0.40431212, 0), (0.40431212, -0.083439), (0.40142644, -0.15960344))
            Line((0.40142644, -0.15960344), (0.3937, -0.166878))
        make_face()
    revolve(axis=Axis((3.302, -2.944255442, 7.37738677), (0, 0, 1)), mode=Mode.SUBTRACT)
    with BuildSketch(Plane(origin=(3.302, -4.214255442, 7.37738677), x_dir=(0, 1, 0), z_dir=(1, 0, 0))) as fillet1_of_lpattern3_piece_5:
        with BuildLine():
            CenterArc((0.007378024, -0.530606), FILLET1_OF_LPATTERN3_R, 43.274584136, 46.725415864)
            Line((0.007378024, 0), (0.007378024, 0.01061212))
            Line((0.007378024, 0.01061212), (0.3937, 0.01061212))
            Line((0.3937, 0.01061212), (0.40431212, 0))
            ThreePointArc((0.40431212, 0), (0.40431212, -0.083439), (0.40142644, -0.15960344))
            Line((0.40142644, -0.15960344), (0.3937, -0.166878))
        make_face()
    revolve(axis=Axis((3.302, -4.214255442, 7.37738677), (0, 0, 1)), mode=Mode.SUBTRACT)
    with BuildSketch(Plane(origin=(4.572, -2.944255442, 7.37738677), x_dir=(0, 1, 0), z_dir=(1, 0, 0))) as fillet1_of_lpattern3_piece_6:
        with BuildLine():
            CenterArc((0.007378024, -0.530606), FILLET1_OF_LPATTERN3_R, 43.274584136, 46.725415864)
            Line((0.007378024, 0), (0.007378024, 0.01061212))
            Line((0.007378024, 0.01061212), (0.3937, 0.01061212))
            Line((0.3937, 0.01061212), (0.40431212, 0))
            ThreePointArc((0.40431212, 0), (0.40431212, -0.083439), (0.40142644, -0.15960344))
            Line((0.40142644, -0.15960344), (0.3937, -0.166878))
        make_face()
    revolve(axis=Axis((4.572, -2.944255442, 7.37738677), (0, 0, 1)), mode=Mode.SUBTRACT)
    with BuildSketch(Plane(origin=(4.572, -4.214255442, 7.37738677), x_dir=(0, 1, 0), z_dir=(1, 0, 0))) as fillet1_of_lpattern3_piece_7:
        with BuildLine():
            CenterArc((0.007378024, -0.530606), FILLET1_OF_LPATTERN3_R, 43.274584136, 46.725415864)
            Line((0.007378024, 0), (0.007378024, 0.01061212))
            Line((0.007378024, 0.01061212), (0.3937, 0.01061212))
            Line((0.3937, 0.01061212), (0.40431212, 0))
            ThreePointArc((0.40431212, 0), (0.40431212, -0.083439), (0.40142644, -0.15960344))
            Line((0.40142644, -0.15960344), (0.3937, -0.166878))
        make_face()
    revolve(axis=Axis((4.572, -4.214255442, 7.37738677), (0, 0, 1)), mode=Mode.SUBTRACT)
    with BuildSketch(Plane(origin=(5.842, -2.944255442, 7.37738677), x_dir=(0, 1, 0), z_dir=(1, 0, 0))) as fillet1_of_lpattern3_piece_8:
        with BuildLine():
            CenterArc((0.007378024, -0.530606), FILLET1_OF_LPATTERN3_R, 43.274584136, 46.725415864)
            Line((0.007378024, 0), (0.007378024, 0.01061212))
            Line((0.007378024, 0.01061212), (0.3937, 0.01061212))
            Line((0.3937, 0.01061212), (0.40431212, 0))
            ThreePointArc((0.40431212, 0), (0.40431212, -0.083439), (0.40142644, -0.15960344))
            Line((0.40142644, -0.15960344), (0.3937, -0.166878))
        make_face()
    revolve(axis=Axis((5.842, -2.944255442, 7.37738677), (0, 0, 1)), mode=Mode.SUBTRACT)
    with BuildSketch(Plane(origin=(5.842, -4.214255442, 7.37738677), x_dir=(0, 1, 0), z_dir=(1, 0, 0))) as fillet1_of_lpattern3_piece_9:
        with BuildLine():
            CenterArc((0.007378024, -0.530606), FILLET1_OF_LPATTERN3_R, 43.274584136, 46.725415864)
            Line((0.007378024, 0), (0.007378024, 0.01061212))
            Line((0.007378024, 0.01061212), (0.3937, 0.01061212))
            Line((0.3937, 0.01061212), (0.40431212, 0))
            ThreePointArc((0.40431212, 0), (0.40431212, -0.083439), (0.40142644, -0.15960344))
            Line((0.40142644, -0.15960344), (0.3937, -0.166878))
        make_face()
    revolve(axis=Axis((5.842, -4.214255442, 7.37738677), (0, 0, 1)), mode=Mode.SUBTRACT)
    with BuildSketch(Plane(origin=(7.112, -2.944255442, 7.37738677), x_dir=(0, 1, 0), z_dir=(1, 0, 0))) as fillet1_of_lpattern3_piece_10:
        with BuildLine():
            CenterArc((0.007378024, -0.530606), FILLET1_OF_LPATTERN3_R, 43.274584136, 46.725415864)
            Line((0.007378024, 0), (0.007378024, 0.01061212))
            Line((0.007378024, 0.01061212), (0.3937, 0.01061212))
            Line((0.3937, 0.01061212), (0.40431212, 0))
            ThreePointArc((0.40431212, 0), (0.40431212, -0.083439), (0.40142644, -0.15960344))
            Line((0.40142644, -0.15960344), (0.3937, -0.166878))
        make_face()
    revolve(axis=Axis((7.112, -2.944255442, 7.37738677), (0, 0, 1)), mode=Mode.SUBTRACT)
    with BuildSketch(Plane(origin=(7.112, -4.214255442, 7.37738677), x_dir=(0, 1, 0), z_dir=(1, 0, 0))) as fillet1_of_lpattern3_piece_11:
        with BuildLine():
            CenterArc((0.007378024, -0.530606), FILLET1_OF_LPATTERN3_R, 43.274584136, 46.725415864)
            Line((0.007378024, 0), (0.007378024, 0.01061212))
            Line((0.007378024, 0.01061212), (0.3937, 0.01061212))
            Line((0.3937, 0.01061212), (0.40431212, 0))
            ThreePointArc((0.40431212, 0), (0.40431212, -0.083439), (0.40142644, -0.15960344))
            Line((0.40142644, -0.15960344), (0.3937, -0.166878))
        make_face()
    revolve(axis=Axis((7.112, -4.214255442, 7.37738677), (0, 0, 1)), mode=Mode.SUBTRACT)

    # Fillet2 of LPattern3
    fillet2_of_lpattern3_edges = [part.edges().sort_by_distance(p)[0] for p in [
        (0.762, -4.607955442, 7.21050877),
        (2.032, -3.337955442, 7.21050877),
        (2.032, -4.607955442, 7.21050877),
        (3.302, -3.337955442, 7.21050877),
        (3.302, -4.607955442, 7.21050877),
        (4.572, -3.337955442, 7.21050877),
        (4.572, -4.607955442, 7.21050877),
        (5.842, -3.337955442, 7.21050877),
        (5.842, -4.607955442, 7.21050877),
        (7.112, -3.337955442, 7.21050877),
        (7.112, -4.607955442, 7.21050877),
    ]]
    fillet(fillet2_of_lpattern3_edges, radius=FILLET2_OF_LPATTERN3_R)

    # Sketch44 → Cut-Extrude4 (cut)
    with BuildSketch(Plane.ZY.offset(0.127).offset(CUT_EXTRUDE4_START)):
        with BuildLine():
            Line((4.381336494, 5.08), (4.381336494, 4.7752))
            ThreePointArc((4.381336494, 4.7752), (4.683343033, 4.675680172), (4.867020284, 4.416113586))
            Line((4.867020284, 4.416113586), (6.883392561, -2.160313435))
            ThreePointArc((6.883392561, -2.160313435), (6.900098741, -2.233938793), (6.90570877, -2.309227021))
            Line((6.90570877, -2.309227021), (6.90570877, -4.849340704))
            ThreePointArc((6.90570877, -4.849340704), (6.704518762, -5.45625147), (6.180628697, -5.822799279))
            Line((6.180628697, -5.822799279), (3.786889459, -6.538172754))
            Line((3.786889459, -6.538172754), (3.874165437, -6.830210326))
            Line((3.874165437, -6.830210326), (6.267904675, -6.114836851))
            ThreePointArc((6.267904675, -6.114836851), (6.94896176, -5.638324699), (7.21050877, -4.849340704))
            Line((7.21050877, -4.849340704), (7.21050877, -2.309227021))
            ThreePointArc((7.21050877, -2.309227021), (7.201532724, -2.188765856), (7.174802835, -2.070965284))
            Line((7.174802835, -2.070965284), (5.158430559, 4.505461737))
            ThreePointArc((5.158430559, 4.505461737), (4.864546956, 4.920768275), (4.381336494, 5.08))
        make_face()
    cut_extrude4 = extrude(amount=CUT_EXTRUDE4_DEPTH, mode=Mode.SUBTRACT)

    # Mirror3: Cut-Extrude4 across plane
    add(cut_extrude4.mirror(Plane(origin=(3.9624, 0, 0), x_dir=(0, 0, 1), z_dir=(1, 0, 0))), mode=Mode.SUBTRACT)


solid = part.part
